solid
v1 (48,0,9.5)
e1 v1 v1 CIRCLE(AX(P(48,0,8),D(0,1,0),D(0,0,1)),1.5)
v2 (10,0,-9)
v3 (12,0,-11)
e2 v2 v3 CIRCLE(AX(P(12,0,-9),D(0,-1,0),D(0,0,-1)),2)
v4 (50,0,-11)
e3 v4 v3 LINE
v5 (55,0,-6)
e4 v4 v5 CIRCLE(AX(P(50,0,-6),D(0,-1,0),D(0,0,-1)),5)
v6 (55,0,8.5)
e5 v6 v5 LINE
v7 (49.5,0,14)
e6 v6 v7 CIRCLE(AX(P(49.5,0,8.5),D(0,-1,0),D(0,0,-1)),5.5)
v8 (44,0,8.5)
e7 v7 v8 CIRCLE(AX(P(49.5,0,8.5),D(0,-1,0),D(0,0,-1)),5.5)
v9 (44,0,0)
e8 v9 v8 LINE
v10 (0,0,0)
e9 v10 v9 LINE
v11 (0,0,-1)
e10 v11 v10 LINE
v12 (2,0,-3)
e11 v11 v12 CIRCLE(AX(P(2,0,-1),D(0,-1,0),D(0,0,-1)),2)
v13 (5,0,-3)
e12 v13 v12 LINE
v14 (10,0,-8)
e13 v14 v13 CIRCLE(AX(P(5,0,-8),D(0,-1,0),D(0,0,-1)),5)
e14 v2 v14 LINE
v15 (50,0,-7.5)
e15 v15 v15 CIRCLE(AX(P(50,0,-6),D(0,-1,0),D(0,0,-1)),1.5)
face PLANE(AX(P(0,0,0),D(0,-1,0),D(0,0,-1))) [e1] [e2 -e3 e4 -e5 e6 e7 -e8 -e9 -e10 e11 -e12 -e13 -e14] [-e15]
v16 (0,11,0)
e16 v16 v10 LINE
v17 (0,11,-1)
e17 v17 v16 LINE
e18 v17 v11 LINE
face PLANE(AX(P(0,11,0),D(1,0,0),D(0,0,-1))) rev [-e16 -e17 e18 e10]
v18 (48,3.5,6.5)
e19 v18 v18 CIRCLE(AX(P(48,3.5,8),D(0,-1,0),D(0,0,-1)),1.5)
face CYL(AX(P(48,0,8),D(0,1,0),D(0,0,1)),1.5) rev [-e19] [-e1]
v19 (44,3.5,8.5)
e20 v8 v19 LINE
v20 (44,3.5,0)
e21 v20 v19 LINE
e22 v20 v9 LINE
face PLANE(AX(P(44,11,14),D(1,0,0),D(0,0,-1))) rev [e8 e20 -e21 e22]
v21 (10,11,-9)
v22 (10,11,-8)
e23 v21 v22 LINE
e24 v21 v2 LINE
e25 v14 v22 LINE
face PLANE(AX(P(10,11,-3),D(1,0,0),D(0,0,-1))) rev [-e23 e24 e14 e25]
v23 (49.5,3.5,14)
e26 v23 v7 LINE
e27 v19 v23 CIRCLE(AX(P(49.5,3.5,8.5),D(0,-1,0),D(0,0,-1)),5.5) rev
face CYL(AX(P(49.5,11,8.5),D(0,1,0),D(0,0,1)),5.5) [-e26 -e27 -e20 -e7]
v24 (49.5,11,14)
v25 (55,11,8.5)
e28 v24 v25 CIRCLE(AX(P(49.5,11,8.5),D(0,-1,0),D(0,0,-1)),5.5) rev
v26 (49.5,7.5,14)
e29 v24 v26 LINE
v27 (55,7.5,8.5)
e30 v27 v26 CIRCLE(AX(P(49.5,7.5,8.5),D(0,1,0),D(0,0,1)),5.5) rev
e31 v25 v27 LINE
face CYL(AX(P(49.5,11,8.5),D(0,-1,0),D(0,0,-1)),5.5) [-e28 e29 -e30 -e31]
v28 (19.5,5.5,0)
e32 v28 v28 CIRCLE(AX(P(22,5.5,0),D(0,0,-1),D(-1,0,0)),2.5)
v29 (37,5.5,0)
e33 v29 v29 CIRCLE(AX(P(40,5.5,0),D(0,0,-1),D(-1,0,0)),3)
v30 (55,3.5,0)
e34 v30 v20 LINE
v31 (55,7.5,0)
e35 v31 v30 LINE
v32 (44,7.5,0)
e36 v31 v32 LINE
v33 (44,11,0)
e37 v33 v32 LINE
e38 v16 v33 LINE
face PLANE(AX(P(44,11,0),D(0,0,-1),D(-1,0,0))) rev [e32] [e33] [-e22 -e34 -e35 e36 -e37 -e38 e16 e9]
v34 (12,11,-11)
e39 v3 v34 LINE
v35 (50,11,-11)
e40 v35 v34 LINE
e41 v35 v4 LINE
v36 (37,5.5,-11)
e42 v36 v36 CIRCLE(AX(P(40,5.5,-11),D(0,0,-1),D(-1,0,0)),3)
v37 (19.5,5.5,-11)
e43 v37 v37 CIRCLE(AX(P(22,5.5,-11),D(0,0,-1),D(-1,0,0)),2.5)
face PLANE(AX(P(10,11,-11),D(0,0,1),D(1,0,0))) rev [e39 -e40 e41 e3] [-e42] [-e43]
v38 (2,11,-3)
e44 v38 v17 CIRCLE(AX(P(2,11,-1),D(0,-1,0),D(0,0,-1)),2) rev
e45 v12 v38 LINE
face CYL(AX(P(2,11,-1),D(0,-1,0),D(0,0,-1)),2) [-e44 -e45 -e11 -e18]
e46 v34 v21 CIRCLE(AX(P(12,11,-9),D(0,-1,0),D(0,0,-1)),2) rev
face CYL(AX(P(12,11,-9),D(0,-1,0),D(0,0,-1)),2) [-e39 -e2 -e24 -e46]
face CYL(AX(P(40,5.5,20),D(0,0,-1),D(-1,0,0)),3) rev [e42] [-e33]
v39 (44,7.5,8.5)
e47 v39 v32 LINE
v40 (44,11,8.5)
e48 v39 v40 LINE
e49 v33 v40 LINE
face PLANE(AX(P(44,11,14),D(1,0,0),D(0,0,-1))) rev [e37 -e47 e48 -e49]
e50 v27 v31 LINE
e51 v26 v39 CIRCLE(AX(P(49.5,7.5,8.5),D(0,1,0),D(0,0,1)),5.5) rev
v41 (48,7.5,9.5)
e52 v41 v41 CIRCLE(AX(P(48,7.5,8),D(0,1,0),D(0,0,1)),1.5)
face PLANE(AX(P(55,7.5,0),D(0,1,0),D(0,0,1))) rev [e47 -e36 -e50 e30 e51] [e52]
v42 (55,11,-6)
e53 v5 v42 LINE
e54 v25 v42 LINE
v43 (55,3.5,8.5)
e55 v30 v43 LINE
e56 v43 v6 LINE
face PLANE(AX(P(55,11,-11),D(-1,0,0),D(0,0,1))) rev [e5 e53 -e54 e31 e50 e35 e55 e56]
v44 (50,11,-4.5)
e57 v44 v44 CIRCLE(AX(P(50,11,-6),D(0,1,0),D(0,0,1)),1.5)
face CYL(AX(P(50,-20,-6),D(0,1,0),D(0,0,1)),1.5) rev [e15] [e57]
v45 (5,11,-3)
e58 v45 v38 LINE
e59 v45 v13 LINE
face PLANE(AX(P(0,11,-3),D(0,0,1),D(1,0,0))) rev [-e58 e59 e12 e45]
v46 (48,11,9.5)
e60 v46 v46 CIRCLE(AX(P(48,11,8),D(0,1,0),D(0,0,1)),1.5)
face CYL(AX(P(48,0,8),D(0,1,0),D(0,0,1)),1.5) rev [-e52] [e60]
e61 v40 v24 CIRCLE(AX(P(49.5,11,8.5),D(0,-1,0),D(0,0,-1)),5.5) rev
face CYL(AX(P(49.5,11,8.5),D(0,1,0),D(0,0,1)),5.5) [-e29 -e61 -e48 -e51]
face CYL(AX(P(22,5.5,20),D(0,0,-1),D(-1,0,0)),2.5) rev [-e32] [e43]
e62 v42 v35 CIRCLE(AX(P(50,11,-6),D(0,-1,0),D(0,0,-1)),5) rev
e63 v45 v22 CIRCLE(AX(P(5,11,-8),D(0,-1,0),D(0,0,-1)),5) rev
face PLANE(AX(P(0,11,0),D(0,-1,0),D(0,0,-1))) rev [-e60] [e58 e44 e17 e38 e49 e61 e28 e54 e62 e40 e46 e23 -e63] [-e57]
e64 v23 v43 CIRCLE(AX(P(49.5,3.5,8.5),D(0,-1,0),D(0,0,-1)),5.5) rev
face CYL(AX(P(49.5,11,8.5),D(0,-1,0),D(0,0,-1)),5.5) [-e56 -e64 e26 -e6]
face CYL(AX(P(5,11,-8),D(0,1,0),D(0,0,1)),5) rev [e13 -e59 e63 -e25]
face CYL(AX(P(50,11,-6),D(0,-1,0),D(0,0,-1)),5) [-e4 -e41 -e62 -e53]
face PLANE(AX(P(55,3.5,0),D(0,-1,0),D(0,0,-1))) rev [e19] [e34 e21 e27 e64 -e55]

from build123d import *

# Parameters (mm, degrees)
BOSS_EXTRUDE1_DEPTH = 11
FILLET1_R           = 2
FILLET2_R           = 5
FILLET3_R           = 2
FILLET4_R           = 5
FILLET5_R           = 5.5
FILLET6_R           = 5.5
SKETCH2_W           = 22.197918088
SKETCH2_H           = 4
CUT_EXTRUDE1_DEPTH  = 11
SKETCH3_R           = 1.5
CUT_EXTRUDE2_DEPTH  = 11
SKETCH4_R           = 3
CUT_EXTRUDE3_DEPTH  = 31
SKETCH5_R           = 2.5
CUT_EXTRUDE4_DEPTH  = 31
SKETCH6_R           = 1.5
CUT_EXTRUDE5_DEPTH  = 31


with BuildPart() as part:
    # Sketch1 → Boss-Extrude1 (new body)
    with BuildSketch(Plane(origin=(0, 0, 0), x_dir=(1, 0, 0), z_dir=(0, 1, 0))):
        Polygon((0, 0), (0, 3), (10, 3), (10, 11), (55, 11), (55, -14), (44, -14), (44, 0), align=None)
    extrude(amount=BOSS_EXTRUDE1_DEPTH)

    # Fillet1
    fillet1_edges = [part.edges().sort_by_distance(p)[0] for p in [
        (0, 5.5, -3),
    ]]
    fillet(fillet1_edges, radius=FILLET1_R)

    # Fillet2
    fillet2_edges = [part.edges().sort_by_distance(p)[0] for p in [
        (10, 5.5, -3),
    ]]
    fillet(fillet2_edges, radius=FILLET2_R)

    # Fillet3
    fillet3_edges = [part.edges().sort_by_distance(p)[0] for p in [
        (10, 5.5, -11),
    ]]
    fillet(fillet3_edges, radius=FILLET3_R)

    # Fillet4
    fillet4_edges = [part.edges().sort_by_distance(p)[0] for p in [
        (55, 5.5, -11),
    ]]
    fillet(fillet4_edges, radius=FILLET4_R)

    # Fillet5
    fillet5_edges = [part.edges().sort_by_distance(p)[0] for p in [
        (44, 5.5, 14),
    ]]
    fillet(fillet5_edges, radius=FILLET5_R)

    # Fillet6
    fillet6_edges = [part.edges().sort_by_distance(p)[0] for p in [
        (55, 5.5, 14),
    ]]
    fillet(fillet6_edges, radius=FILLET6_R - 0.0001)  # a hair under: the kernel refuses the full size

    # Sketch2 → Cut-Extrude1 (cut)
    with BuildSketch(Plane.ZY.offset(-44)):
        with Locations((11.098959044, 5.5)):
            Rectangle(SKETCH2_W, SKETCH2_H)
    extrude(amount=-CUT_EXTRUDE1_DEPTH, mode=Mode.SUBTRACT)

    # Sketch3 → Cut-Extrude2 (cut)
    with BuildSketch(Plane(origin=(0, 11, 0), x_dir=(1, 0, 0), z_dir=(0, 1, 0))):
        with Locations(Location((48, -8, 0), (0, 0, 270))):
            Circle(SKETCH3_R)
    extrude(amount=-CUT_EXTRUDE2_DEPTH, mode=Mode.SUBTRACT)

    # Sketch4 → Cut-Extrude3 (cut)
    with BuildSketch(Plane(origin=(0, 0, -11), x_dir=(-1, 0, 0), z_dir=(0, 0, -1))):
        with Locations((-40, 5.5)):
            Circle(SKETCH4_R)
    extrude(amount=-CUT_EXTRUDE3_DEPTH, mode=Mode.SUBTRACT)

    # Sketch5 → Cut-Extrude4 (cut)
    with BuildSketch(Plane(origin=(0, 0, -11), x_dir=(-1, 0, 0), z_dir=(0, 0, -1))):
        with Locations((-22, 5.5)):
            Circle(SKETCH5_R)
    extrude(amount=-CUT_EXTRUDE4_DEPTH, mode=Mode.SUBTRACT)

    # Sketch6 → Cut-Extrude5 (cut)
    with BuildSketch(Plane(origin=(0, 11, 0), x_dir=(1, 0, 0), z_dir=(0, 1, 0))):
        with Locations(Location((50, 6, 0), (0, 0, 270))):
            Circle(SKETCH6_R)
    extrude(amount=-CUT_EXTRUDE5_DEPTH, mode=Mode.SUBTRACT)


solid = part.part
